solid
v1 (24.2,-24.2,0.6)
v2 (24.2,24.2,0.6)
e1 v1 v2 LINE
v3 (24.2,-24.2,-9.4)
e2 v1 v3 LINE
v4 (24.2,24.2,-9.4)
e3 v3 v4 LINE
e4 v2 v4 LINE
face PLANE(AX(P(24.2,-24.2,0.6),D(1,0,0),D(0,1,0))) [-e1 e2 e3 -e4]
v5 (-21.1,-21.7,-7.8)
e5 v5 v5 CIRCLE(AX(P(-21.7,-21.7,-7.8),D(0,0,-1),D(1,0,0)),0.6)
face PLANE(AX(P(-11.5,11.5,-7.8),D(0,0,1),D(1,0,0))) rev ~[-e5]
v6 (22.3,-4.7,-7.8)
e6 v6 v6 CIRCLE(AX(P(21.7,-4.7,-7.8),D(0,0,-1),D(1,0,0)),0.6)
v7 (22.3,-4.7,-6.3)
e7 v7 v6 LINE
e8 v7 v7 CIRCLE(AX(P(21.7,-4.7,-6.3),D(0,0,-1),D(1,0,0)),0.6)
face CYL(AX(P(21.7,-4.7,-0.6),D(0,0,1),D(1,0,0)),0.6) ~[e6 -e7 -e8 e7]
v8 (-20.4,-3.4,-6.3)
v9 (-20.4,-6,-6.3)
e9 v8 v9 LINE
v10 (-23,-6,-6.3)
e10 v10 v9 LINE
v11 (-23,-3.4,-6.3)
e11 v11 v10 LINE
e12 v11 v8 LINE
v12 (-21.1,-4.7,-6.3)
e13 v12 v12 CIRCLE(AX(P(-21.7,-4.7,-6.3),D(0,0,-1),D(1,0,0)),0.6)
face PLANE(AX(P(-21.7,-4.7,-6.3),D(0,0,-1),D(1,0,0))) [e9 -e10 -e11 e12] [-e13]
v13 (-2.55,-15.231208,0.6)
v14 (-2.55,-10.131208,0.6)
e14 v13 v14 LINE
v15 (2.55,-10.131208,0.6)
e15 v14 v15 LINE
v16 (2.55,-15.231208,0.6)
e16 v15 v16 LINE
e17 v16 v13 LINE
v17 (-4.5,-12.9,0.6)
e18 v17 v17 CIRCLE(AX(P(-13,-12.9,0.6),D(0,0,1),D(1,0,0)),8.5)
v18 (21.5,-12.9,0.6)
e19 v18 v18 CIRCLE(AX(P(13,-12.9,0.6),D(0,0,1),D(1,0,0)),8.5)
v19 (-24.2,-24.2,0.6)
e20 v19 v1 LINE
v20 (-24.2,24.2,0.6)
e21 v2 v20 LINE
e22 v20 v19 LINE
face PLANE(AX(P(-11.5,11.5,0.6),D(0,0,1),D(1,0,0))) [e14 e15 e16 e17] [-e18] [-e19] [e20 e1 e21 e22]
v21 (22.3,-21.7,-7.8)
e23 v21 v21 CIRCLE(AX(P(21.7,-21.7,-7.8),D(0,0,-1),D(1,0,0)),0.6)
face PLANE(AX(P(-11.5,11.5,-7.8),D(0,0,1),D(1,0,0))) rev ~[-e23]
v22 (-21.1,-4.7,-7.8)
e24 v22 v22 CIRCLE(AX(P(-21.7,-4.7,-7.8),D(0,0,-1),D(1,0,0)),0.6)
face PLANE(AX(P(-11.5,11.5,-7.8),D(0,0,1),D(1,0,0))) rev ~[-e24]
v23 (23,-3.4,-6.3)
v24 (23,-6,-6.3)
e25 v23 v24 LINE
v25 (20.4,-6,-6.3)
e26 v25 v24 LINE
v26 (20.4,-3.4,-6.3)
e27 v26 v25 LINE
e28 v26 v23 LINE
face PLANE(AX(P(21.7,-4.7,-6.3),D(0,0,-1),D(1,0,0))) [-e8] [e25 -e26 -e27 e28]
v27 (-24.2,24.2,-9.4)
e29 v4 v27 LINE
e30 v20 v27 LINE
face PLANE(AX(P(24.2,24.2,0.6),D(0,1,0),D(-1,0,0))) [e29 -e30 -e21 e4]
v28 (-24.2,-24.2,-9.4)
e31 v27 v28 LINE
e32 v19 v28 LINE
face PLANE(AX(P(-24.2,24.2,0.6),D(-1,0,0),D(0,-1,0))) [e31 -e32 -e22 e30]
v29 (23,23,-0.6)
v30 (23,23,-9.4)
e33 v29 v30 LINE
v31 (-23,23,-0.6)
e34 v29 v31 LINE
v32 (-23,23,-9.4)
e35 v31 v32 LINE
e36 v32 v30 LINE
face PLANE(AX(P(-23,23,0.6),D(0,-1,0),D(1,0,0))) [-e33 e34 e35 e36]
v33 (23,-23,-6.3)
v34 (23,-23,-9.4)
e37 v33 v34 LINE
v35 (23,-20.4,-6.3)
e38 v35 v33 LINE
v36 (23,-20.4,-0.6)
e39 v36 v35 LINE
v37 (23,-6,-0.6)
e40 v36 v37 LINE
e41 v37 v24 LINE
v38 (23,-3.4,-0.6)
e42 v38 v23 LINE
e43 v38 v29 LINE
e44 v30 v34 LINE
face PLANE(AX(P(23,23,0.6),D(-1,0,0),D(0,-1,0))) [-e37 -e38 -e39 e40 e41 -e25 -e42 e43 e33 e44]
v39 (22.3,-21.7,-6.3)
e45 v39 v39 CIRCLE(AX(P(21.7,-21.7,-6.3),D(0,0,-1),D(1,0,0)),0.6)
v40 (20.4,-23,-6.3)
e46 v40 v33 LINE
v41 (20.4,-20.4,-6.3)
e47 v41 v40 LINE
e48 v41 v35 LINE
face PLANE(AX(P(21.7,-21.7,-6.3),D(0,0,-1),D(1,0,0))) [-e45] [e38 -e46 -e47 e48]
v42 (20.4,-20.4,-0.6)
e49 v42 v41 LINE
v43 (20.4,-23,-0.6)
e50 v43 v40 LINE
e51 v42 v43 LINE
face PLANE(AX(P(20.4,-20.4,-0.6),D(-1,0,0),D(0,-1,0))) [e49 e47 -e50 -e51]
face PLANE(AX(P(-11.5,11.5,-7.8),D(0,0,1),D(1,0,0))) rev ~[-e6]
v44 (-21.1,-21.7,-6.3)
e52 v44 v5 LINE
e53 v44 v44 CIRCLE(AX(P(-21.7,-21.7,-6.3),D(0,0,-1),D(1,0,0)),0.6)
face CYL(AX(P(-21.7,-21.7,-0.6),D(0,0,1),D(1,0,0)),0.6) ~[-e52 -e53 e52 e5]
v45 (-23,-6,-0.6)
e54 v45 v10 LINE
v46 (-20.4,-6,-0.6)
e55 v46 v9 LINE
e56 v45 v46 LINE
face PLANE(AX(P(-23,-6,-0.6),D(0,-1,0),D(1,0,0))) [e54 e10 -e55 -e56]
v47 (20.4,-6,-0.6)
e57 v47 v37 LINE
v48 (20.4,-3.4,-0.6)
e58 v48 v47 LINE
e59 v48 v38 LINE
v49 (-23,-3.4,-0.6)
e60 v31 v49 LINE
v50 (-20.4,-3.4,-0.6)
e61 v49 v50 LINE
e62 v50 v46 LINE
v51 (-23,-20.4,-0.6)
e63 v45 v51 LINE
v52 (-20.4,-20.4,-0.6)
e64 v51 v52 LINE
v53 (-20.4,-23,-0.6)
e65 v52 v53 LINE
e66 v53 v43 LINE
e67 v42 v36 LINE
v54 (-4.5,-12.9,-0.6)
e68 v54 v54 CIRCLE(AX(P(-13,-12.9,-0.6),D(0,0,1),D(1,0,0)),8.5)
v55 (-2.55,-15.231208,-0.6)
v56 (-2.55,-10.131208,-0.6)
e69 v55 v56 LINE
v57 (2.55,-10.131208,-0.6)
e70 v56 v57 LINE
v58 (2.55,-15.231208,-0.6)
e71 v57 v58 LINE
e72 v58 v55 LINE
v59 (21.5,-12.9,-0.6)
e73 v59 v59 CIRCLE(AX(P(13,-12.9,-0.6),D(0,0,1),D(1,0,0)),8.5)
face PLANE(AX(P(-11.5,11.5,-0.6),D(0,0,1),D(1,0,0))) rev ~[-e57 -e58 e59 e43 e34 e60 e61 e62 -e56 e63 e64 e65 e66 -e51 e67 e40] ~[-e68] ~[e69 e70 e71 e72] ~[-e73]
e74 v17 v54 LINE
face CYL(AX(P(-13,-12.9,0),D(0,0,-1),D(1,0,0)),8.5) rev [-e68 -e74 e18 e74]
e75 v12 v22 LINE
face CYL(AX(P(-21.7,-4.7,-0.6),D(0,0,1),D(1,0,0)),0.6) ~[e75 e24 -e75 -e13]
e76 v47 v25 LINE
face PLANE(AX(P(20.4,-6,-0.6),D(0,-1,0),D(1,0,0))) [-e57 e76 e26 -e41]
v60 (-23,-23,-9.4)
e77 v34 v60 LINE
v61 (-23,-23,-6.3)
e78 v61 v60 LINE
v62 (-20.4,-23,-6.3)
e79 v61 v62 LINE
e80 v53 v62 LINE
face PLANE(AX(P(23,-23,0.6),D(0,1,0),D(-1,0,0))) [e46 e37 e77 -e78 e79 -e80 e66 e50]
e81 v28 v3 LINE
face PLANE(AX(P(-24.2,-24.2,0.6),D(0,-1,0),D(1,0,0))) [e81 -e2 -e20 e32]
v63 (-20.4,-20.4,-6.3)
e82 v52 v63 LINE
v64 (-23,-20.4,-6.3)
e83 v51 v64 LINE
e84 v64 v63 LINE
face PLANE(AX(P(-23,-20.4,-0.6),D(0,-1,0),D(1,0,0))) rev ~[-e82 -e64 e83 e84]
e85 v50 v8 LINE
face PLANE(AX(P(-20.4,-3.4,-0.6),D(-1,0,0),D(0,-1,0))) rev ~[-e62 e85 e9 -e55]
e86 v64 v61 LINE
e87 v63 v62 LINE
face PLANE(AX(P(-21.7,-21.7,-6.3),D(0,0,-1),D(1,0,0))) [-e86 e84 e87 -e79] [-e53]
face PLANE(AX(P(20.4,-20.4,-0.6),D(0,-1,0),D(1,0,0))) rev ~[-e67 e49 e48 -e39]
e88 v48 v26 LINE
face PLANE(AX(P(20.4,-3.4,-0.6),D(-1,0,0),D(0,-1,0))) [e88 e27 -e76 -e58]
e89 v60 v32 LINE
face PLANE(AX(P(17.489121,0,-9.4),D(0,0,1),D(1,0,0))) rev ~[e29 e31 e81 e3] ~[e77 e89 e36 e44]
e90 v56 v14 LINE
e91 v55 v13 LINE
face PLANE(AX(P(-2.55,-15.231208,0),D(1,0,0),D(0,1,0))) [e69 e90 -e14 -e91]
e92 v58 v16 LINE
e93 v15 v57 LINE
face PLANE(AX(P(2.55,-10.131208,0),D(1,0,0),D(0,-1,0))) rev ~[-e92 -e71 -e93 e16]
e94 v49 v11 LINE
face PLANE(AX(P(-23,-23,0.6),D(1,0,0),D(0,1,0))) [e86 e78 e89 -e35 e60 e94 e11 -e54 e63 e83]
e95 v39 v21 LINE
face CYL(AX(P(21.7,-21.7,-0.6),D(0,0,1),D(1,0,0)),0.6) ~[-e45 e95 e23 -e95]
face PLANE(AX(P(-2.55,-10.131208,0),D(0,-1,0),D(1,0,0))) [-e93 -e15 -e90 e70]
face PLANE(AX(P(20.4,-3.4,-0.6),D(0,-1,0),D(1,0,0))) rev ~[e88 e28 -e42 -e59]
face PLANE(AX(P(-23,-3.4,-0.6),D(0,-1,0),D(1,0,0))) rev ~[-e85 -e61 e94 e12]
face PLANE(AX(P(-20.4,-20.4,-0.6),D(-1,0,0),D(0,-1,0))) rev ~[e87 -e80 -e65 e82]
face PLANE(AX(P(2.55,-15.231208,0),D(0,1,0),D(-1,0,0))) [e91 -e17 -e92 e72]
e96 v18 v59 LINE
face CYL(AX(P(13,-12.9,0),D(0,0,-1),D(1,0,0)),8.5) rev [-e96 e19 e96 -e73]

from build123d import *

# Parameters (mm, degrees)
F0_W     = 23
F0_H     = 23
F0_R     = 8.5
F1_DEPTH = 0.6
F3_DEPTH = 10
F4_W     = 2.6
F4_H     = 2.6
F4_R     = 0.6
F5_DEPTH = 5.7
F6_DEPTH = 7.2


with BuildPart() as f1:
    # F0 (on Top) → F1 (new body, symmetric)
    with BuildSketch(Plane.XY):
        with Locations((-11.5, 11.5)):
            Rectangle(F0_W, F0_H)
        Polygon((0, -10.1312079445), (0, 0), (-23, 0), (-23, -23), (0, -23), (0, -15.2312079445), (-2.55, -15.2312079445), (-2.55, -10.1312079445), align=None)
        with Locations((-13, -12.9)):
            Circle(F0_R, mode=Mode.SUBTRACT)
        with Locations((11.5, 11.5)):
            Rectangle(F0_W, F0_H)
        Polygon((23, 0), (0, 0), (0, -10.1312079445), (2.55, -10.1312079445), (2.55, -15.2312079445), (0, -15.2312079445), (0, -23), (23, -23), align=None)
        with Locations((13, -12.9)):
            Circle(F0_R, mode=Mode.SUBTRACT)
    extrude(amount=F1_DEPTH, both=True)

    # F2 (on face) → F3 (join)
    with BuildSketch(Plane.XY.offset(0.6)):
        Polygon((0, 23), (23, 23), (23, -23), (0, -23), (0, -24.2), (24.2, -24.2), (24.2, 24.2), (0, 24.2), align=None)
        Polygon((-23, 23), (0, 23), (0, 24.2), (-24.2, 24.2), (-24.2, -24.2), (0, -24.2), (0, -23), (-23, -23), align=None)
    extrude(amount=-F3_DEPTH)

    # F4 (on face) → F5 (join)
    with BuildSketch(Plane(origin=(0, 0, -0.6), x_dir=(1, 0, 0), z_dir=(0, 0, -1))):
        with Locations((21.7, 21.7)):
            Rectangle(F4_W, F4_H)
        with Locations((21.7, 21.7)):
            Circle(F4_R, mode=Mode.SUBTRACT)
        with Locations((-21.7, 21.7)):
            Rectangle(F4_W, F4_H)
        with Locations((-21.7, 21.7)):
            Circle(F4_R, mode=Mode.SUBTRACT)
        with Locations((-21.7, 4.7)):
            Rectangle(F4_W, F4_H)
        with Locations((-21.7, 4.7)):
            Circle(F4_R, mode=Mode.SUBTRACT)
        with Locations((21.7, 4.7000000451)):
            Rectangle(F4_W, F4_H)
        with Locations((21.7, 4.7000000451)):
            Circle(F4_R, mode=Mode.SUBTRACT)
    extrude(amount=F5_DEPTH)

    # F6 (add): faces of the model
    f6_faces = [f1.faces().sort_by_distance(p)[0] for p in [
        (-21.7, -4.7, -0.6),
        (-21.7, -21.7, -0.6),
        (21.7, -21.7, -0.6),
        (21.7, -4.7000000451, -0.6),
    ]]
    extrude(f6_faces, amount=F6_DEPTH)


solid = f1.part
